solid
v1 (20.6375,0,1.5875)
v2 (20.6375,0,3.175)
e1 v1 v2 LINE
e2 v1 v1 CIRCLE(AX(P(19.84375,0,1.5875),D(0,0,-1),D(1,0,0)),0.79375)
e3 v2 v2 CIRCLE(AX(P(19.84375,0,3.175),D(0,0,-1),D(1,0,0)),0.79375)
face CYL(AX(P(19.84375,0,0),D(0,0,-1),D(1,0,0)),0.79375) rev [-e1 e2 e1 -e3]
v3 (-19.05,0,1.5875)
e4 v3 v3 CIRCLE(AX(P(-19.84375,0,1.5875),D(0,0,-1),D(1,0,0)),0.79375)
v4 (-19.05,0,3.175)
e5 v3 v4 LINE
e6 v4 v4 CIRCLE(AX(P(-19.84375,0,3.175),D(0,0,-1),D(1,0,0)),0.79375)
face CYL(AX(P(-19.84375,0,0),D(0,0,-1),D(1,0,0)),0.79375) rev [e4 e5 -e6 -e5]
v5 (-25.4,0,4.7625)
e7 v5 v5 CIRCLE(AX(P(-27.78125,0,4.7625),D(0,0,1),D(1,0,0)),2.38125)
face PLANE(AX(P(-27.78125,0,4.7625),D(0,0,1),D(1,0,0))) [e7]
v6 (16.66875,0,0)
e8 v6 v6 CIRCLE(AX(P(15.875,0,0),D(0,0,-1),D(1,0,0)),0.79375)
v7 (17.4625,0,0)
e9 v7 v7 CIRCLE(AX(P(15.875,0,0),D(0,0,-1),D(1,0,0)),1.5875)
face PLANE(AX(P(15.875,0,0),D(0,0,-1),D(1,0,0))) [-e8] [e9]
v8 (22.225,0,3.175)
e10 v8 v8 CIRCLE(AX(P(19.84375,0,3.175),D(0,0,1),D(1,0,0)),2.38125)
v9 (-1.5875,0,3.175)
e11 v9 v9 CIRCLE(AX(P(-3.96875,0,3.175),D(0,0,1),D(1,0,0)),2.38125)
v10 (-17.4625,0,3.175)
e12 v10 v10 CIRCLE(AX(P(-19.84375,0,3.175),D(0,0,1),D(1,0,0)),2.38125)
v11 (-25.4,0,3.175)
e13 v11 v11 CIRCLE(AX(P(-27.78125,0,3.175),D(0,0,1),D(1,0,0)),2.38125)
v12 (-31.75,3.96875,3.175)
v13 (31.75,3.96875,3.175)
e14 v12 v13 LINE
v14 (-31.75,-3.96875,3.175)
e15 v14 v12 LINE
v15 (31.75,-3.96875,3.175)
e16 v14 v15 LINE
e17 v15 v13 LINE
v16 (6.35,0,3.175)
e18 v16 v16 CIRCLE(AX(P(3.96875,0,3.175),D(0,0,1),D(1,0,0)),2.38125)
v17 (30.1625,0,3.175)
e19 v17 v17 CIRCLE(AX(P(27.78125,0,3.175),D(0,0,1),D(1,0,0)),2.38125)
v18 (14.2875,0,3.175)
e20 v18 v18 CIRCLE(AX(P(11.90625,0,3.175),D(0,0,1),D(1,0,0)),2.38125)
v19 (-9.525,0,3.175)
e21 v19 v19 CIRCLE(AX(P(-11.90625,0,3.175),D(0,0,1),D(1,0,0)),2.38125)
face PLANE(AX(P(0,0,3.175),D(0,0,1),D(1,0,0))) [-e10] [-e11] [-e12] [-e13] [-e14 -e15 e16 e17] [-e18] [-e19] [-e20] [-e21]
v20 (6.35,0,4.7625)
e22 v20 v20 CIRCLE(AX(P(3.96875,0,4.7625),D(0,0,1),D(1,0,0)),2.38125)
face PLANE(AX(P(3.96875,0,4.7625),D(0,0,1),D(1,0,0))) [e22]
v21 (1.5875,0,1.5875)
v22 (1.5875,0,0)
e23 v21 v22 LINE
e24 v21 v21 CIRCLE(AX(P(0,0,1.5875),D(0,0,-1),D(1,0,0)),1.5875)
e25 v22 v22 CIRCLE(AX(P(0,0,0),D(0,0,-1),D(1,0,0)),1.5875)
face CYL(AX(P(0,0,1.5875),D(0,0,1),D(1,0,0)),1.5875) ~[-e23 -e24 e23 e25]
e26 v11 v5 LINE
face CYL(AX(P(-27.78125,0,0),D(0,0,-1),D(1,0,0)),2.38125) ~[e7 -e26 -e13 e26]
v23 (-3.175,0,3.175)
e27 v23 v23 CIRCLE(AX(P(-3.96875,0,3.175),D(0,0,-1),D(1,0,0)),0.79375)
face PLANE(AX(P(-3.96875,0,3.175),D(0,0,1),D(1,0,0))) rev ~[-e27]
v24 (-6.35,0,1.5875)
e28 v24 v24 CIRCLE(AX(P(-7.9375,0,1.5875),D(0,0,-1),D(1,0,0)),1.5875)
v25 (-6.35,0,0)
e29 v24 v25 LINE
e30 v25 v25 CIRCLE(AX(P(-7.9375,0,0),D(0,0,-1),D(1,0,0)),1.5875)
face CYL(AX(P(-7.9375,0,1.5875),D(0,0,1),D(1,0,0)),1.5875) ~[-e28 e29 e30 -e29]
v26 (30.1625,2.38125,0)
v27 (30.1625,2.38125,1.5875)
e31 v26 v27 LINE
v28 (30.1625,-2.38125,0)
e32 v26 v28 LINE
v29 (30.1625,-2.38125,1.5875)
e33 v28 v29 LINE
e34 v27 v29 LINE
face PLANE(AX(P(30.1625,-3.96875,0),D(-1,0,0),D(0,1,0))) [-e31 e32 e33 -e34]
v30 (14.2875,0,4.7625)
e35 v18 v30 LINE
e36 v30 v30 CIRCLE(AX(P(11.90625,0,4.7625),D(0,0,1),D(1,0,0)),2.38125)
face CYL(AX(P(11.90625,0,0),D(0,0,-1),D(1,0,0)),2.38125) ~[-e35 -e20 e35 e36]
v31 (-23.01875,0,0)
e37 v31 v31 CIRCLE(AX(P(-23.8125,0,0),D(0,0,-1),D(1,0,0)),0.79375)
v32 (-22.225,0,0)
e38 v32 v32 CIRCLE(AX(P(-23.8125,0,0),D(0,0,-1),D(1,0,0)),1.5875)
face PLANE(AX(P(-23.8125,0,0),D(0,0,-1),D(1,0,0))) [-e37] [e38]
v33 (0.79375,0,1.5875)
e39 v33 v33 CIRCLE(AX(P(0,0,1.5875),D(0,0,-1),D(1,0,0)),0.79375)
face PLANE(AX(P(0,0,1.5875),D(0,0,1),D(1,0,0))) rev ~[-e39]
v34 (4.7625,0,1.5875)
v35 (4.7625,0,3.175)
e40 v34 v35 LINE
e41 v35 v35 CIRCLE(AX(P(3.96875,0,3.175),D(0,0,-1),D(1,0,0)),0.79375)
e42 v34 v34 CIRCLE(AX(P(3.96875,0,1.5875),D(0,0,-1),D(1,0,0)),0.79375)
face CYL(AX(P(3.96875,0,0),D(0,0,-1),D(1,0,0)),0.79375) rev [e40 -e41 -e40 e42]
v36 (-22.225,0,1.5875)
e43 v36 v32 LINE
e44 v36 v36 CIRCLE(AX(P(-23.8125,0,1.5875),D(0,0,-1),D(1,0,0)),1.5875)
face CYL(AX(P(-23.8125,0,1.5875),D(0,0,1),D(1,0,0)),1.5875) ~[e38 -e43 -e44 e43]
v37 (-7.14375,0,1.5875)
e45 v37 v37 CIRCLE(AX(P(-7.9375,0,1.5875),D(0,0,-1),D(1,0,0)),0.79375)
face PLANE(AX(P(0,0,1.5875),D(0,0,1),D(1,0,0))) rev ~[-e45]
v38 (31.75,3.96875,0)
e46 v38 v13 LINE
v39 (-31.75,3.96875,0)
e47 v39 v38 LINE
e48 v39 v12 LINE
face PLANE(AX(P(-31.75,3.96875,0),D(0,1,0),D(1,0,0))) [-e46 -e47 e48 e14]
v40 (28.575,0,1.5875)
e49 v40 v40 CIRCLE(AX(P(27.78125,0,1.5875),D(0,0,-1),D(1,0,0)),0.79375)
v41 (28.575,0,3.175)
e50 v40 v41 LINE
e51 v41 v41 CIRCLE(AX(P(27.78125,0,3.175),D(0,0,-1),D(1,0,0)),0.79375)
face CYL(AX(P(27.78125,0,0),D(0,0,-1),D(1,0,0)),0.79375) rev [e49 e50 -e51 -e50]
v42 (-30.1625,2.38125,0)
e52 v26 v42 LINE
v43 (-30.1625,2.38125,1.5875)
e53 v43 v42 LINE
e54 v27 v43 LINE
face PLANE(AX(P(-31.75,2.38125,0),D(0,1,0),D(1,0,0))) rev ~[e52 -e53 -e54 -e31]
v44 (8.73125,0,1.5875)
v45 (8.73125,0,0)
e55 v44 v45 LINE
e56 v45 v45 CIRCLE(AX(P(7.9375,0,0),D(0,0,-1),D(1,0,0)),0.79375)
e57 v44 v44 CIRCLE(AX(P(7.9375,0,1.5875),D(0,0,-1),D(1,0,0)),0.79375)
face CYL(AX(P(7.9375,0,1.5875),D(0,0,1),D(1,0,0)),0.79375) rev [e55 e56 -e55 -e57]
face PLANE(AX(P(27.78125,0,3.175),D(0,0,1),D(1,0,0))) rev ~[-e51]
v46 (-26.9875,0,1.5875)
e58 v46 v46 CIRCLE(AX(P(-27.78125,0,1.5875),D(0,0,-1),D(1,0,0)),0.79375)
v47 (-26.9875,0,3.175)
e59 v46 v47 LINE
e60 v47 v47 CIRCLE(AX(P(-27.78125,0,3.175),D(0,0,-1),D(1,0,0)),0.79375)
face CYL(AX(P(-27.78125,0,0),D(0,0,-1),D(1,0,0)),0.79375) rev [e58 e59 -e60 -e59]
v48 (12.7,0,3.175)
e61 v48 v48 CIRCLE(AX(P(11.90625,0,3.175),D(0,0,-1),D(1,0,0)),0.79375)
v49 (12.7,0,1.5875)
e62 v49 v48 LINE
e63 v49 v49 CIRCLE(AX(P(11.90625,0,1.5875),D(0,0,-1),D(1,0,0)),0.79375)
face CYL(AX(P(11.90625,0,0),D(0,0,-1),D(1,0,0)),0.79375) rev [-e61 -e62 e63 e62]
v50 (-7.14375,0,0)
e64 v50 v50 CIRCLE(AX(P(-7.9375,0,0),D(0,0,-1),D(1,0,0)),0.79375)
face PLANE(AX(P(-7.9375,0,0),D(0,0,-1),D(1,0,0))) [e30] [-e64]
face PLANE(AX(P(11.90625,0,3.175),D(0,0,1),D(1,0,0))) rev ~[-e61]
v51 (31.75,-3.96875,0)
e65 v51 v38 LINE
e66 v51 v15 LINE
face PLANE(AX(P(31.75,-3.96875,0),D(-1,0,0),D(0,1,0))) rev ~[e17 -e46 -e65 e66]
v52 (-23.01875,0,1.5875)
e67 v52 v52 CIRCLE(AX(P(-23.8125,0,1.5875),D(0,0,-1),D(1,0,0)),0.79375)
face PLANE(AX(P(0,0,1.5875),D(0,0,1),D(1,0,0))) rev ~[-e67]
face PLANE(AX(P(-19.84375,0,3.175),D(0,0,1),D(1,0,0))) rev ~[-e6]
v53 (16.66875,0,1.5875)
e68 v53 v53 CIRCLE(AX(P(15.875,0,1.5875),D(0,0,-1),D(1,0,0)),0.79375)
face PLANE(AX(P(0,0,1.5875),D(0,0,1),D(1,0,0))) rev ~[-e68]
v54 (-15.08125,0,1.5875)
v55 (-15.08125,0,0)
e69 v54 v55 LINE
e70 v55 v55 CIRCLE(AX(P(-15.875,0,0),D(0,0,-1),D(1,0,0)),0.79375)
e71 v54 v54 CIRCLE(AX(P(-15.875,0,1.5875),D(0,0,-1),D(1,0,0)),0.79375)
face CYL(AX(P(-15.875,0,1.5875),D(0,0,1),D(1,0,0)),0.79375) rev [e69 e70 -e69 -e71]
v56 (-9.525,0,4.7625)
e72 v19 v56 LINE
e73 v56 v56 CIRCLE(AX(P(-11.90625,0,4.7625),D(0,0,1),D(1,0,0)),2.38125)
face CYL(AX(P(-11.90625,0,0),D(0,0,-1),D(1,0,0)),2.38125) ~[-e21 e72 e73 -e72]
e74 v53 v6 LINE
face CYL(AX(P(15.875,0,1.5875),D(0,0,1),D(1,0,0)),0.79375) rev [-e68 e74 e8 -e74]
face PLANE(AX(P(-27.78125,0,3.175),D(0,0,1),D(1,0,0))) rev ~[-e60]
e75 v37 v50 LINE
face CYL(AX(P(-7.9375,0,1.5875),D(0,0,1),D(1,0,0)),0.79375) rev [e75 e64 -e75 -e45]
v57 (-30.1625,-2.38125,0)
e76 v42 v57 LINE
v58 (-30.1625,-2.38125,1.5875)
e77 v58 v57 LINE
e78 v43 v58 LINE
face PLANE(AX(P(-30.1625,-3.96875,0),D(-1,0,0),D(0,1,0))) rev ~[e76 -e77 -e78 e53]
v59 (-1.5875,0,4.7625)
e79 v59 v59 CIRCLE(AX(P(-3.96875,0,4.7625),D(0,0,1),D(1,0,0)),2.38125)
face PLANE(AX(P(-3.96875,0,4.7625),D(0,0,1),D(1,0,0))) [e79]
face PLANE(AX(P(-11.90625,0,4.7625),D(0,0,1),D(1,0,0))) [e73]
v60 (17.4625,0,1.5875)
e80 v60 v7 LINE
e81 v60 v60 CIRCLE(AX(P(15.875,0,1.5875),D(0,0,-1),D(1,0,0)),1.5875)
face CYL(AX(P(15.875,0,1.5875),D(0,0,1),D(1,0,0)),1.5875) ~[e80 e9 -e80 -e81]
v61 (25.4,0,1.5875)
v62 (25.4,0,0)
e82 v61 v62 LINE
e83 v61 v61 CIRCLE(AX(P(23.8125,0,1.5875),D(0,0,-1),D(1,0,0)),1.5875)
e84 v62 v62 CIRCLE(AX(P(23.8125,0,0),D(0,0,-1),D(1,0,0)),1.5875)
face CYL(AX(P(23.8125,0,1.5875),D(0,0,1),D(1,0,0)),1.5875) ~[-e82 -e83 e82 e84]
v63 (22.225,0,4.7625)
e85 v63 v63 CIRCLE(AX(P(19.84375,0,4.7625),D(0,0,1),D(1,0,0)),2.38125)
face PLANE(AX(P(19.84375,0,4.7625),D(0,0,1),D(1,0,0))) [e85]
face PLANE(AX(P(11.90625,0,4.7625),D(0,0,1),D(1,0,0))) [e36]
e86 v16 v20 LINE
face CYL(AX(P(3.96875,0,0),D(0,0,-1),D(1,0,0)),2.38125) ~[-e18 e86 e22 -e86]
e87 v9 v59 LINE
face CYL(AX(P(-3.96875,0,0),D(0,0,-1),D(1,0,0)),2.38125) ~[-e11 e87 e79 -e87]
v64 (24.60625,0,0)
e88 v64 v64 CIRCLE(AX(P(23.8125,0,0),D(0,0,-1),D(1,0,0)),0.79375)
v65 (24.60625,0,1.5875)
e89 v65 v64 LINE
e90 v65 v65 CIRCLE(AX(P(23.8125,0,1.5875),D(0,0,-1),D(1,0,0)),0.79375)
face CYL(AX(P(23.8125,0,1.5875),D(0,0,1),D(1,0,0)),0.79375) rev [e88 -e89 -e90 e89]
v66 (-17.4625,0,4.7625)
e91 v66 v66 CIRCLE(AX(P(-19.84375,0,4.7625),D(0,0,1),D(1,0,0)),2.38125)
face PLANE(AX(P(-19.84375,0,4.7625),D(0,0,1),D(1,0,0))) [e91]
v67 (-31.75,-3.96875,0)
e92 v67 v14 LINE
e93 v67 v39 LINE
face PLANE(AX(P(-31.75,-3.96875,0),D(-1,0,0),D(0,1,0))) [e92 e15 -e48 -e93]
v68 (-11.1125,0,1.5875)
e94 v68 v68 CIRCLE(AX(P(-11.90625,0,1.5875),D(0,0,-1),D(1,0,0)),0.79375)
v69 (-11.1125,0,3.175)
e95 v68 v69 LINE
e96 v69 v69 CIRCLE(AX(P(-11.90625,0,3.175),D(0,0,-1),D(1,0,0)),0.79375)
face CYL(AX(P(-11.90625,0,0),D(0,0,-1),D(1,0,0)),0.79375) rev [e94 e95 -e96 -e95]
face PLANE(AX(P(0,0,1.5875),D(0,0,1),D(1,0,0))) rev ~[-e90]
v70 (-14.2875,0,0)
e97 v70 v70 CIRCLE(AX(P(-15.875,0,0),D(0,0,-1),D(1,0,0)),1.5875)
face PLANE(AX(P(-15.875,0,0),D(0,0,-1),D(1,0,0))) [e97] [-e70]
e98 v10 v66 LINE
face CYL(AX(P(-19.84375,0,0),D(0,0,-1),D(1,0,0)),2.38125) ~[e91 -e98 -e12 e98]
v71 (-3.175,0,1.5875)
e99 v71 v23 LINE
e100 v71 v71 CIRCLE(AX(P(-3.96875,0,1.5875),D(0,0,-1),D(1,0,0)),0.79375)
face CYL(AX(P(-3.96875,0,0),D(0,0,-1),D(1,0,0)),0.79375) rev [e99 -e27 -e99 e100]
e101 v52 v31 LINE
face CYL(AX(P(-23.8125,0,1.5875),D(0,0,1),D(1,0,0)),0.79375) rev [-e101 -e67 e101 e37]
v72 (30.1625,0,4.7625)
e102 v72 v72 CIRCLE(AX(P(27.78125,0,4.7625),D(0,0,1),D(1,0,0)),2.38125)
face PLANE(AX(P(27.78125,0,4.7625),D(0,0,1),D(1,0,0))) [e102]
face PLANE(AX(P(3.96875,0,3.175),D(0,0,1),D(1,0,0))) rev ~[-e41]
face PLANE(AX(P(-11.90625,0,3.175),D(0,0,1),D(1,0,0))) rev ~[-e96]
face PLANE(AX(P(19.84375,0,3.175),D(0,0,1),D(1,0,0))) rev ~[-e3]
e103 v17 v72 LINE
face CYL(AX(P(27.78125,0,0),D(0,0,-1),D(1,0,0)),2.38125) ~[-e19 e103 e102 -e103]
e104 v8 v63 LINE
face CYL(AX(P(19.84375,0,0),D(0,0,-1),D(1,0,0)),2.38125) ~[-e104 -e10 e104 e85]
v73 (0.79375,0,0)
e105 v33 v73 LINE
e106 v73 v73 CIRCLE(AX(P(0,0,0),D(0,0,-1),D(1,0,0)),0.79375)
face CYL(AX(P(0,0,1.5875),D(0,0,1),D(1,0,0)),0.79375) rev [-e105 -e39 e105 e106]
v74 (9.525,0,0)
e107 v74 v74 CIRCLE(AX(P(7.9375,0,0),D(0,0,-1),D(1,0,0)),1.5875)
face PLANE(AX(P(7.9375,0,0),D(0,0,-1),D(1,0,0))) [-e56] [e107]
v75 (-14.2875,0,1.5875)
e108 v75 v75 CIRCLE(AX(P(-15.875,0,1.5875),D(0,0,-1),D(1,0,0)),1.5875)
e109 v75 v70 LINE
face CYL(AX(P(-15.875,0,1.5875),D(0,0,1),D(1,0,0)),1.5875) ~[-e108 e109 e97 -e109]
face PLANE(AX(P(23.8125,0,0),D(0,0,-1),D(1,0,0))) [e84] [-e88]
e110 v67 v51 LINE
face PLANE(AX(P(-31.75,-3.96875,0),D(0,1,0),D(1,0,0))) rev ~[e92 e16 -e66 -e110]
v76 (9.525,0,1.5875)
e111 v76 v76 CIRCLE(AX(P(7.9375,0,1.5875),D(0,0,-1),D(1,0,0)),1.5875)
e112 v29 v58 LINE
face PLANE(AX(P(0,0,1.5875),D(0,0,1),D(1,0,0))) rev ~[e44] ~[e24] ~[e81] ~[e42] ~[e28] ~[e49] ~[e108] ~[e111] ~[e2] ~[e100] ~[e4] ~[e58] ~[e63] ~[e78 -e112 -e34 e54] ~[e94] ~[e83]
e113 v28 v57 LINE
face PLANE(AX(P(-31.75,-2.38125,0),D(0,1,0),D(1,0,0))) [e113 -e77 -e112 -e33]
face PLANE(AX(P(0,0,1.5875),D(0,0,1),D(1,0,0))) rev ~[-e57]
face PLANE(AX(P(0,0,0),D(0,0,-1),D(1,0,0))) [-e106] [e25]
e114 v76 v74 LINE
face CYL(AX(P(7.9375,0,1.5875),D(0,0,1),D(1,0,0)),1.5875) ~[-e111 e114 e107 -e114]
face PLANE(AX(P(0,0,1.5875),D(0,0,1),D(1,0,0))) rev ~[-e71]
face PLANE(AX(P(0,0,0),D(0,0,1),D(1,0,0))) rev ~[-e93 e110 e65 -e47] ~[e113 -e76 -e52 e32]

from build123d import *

# Parameters (mm, degrees)
F0_W     = 63.5
F0_H     = 7.9375
F0_R     = 2.38125
F1_DEPTH = 3.175
F2_DEPTH = 4.7625
F3_T     = -1.5875
F4_R     = 1.5875
F4_R_2   = 0.79375
F5_DEPTH = 1.5875


# Not quite as in the source:
# - a feature names something its author has since deleted; it is built from what else it names


with BuildPart() as f1:
    # F0 (on Top) → F1 (new body)
    with BuildSketch(Plane.XY):
        Rectangle(F0_W, F0_H)
        with Locations((-27.78125, 0)):
            Circle(F0_R, mode=Mode.SUBTRACT)
        with Locations((-19.84375, 0)):
            Circle(F0_R, mode=Mode.SUBTRACT)
        with Locations((-11.90625, 0)):
            Circle(F0_R, mode=Mode.SUBTRACT)
        with Locations((-3.96875, 0)):
            Circle(F0_R, mode=Mode.SUBTRACT)
        with Locations((3.96875, 0)):
            Circle(F0_R, mode=Mode.SUBTRACT)
        with Locations((11.90625, 0)):
            Circle(F0_R, mode=Mode.SUBTRACT)
        with Locations((19.84375, 0)):
            Circle(F0_R, mode=Mode.SUBTRACT)
        with Locations((27.78125, 0)):
            Circle(F0_R, mode=Mode.SUBTRACT)
    extrude(amount=F1_DEPTH)

    # F0 (on Top) → F2 (join)
    with BuildSketch(Plane.XY):
        with Locations((-27.78125, 0)):
            Circle(F0_R)
        with Locations((-11.90625, 0)):
            Circle(F0_R)
        with Locations((-19.84375, 0)):
            Circle(F0_R)
        with Locations((-3.96875, 0)):
            Circle(F0_R)
        with Locations((3.96875, 0)):
            Circle(F0_R)
        with Locations((11.90625, 0)):
            Circle(F0_R)
        with Locations((19.84375, 0)):
            Circle(F0_R)
        with Locations((27.78125, 0)):
            Circle(F0_R)
    extrude(amount=F2_DEPTH)

    # F3
    f3_openings = [f1.faces().sort_by_distance(p)[0] for p in [
        (0, 0, 0),
    ]]
    offset(amount=F3_T, openings=f3_openings, kind=Kind.INTERSECTION)

    # F4 (on face) → F5 (join)
    with BuildSketch(Plane(origin=(0, 0, 1.5875), x_dir=(1, 0, 0), z_dir=(0, 0, -1))):
        with Locations((-23.8125, 0)):
            Circle(F4_R)
        with Locations((-23.8125, 0)):
            Circle(F4_R_2, mode=Mode.SUBTRACT)
        with Locations((-15.875, 0)):
            Circle(F4_R)
        with Locations((-15.875, 0)):
            Circle(F4_R_2, mode=Mode.SUBTRACT)
        with Locations((-7.9375, 0)):
            Circle(F4_R)
        with Locations((-7.9375, 0)):
            Circle(F4_R_2, mode=Mode.SUBTRACT)
        Circle(F4_R)
        Circle(F4_R_2, mode=Mode.SUBTRACT)
        with Locations((7.9375, 0)):
            Circle(F4_R)
        with Locations((7.9375, 0)):
            Circle(F4_R_2, mode=Mode.SUBTRACT)
        with Locations((15.875, 0)):
            Circle(F4_R)
        with Locations((15.875, 0)):
            Circle(F4_R_2, mode=Mode.SUBTRACT)
        with Locations((23.8125, 0)):
            Circle(F4_R)
        with Locations((23.8125, 0)):
            Circle(F4_R_2, mode=Mode.SUBTRACT)
    extrude(amount=F5_DEPTH)


solid = f1.part
